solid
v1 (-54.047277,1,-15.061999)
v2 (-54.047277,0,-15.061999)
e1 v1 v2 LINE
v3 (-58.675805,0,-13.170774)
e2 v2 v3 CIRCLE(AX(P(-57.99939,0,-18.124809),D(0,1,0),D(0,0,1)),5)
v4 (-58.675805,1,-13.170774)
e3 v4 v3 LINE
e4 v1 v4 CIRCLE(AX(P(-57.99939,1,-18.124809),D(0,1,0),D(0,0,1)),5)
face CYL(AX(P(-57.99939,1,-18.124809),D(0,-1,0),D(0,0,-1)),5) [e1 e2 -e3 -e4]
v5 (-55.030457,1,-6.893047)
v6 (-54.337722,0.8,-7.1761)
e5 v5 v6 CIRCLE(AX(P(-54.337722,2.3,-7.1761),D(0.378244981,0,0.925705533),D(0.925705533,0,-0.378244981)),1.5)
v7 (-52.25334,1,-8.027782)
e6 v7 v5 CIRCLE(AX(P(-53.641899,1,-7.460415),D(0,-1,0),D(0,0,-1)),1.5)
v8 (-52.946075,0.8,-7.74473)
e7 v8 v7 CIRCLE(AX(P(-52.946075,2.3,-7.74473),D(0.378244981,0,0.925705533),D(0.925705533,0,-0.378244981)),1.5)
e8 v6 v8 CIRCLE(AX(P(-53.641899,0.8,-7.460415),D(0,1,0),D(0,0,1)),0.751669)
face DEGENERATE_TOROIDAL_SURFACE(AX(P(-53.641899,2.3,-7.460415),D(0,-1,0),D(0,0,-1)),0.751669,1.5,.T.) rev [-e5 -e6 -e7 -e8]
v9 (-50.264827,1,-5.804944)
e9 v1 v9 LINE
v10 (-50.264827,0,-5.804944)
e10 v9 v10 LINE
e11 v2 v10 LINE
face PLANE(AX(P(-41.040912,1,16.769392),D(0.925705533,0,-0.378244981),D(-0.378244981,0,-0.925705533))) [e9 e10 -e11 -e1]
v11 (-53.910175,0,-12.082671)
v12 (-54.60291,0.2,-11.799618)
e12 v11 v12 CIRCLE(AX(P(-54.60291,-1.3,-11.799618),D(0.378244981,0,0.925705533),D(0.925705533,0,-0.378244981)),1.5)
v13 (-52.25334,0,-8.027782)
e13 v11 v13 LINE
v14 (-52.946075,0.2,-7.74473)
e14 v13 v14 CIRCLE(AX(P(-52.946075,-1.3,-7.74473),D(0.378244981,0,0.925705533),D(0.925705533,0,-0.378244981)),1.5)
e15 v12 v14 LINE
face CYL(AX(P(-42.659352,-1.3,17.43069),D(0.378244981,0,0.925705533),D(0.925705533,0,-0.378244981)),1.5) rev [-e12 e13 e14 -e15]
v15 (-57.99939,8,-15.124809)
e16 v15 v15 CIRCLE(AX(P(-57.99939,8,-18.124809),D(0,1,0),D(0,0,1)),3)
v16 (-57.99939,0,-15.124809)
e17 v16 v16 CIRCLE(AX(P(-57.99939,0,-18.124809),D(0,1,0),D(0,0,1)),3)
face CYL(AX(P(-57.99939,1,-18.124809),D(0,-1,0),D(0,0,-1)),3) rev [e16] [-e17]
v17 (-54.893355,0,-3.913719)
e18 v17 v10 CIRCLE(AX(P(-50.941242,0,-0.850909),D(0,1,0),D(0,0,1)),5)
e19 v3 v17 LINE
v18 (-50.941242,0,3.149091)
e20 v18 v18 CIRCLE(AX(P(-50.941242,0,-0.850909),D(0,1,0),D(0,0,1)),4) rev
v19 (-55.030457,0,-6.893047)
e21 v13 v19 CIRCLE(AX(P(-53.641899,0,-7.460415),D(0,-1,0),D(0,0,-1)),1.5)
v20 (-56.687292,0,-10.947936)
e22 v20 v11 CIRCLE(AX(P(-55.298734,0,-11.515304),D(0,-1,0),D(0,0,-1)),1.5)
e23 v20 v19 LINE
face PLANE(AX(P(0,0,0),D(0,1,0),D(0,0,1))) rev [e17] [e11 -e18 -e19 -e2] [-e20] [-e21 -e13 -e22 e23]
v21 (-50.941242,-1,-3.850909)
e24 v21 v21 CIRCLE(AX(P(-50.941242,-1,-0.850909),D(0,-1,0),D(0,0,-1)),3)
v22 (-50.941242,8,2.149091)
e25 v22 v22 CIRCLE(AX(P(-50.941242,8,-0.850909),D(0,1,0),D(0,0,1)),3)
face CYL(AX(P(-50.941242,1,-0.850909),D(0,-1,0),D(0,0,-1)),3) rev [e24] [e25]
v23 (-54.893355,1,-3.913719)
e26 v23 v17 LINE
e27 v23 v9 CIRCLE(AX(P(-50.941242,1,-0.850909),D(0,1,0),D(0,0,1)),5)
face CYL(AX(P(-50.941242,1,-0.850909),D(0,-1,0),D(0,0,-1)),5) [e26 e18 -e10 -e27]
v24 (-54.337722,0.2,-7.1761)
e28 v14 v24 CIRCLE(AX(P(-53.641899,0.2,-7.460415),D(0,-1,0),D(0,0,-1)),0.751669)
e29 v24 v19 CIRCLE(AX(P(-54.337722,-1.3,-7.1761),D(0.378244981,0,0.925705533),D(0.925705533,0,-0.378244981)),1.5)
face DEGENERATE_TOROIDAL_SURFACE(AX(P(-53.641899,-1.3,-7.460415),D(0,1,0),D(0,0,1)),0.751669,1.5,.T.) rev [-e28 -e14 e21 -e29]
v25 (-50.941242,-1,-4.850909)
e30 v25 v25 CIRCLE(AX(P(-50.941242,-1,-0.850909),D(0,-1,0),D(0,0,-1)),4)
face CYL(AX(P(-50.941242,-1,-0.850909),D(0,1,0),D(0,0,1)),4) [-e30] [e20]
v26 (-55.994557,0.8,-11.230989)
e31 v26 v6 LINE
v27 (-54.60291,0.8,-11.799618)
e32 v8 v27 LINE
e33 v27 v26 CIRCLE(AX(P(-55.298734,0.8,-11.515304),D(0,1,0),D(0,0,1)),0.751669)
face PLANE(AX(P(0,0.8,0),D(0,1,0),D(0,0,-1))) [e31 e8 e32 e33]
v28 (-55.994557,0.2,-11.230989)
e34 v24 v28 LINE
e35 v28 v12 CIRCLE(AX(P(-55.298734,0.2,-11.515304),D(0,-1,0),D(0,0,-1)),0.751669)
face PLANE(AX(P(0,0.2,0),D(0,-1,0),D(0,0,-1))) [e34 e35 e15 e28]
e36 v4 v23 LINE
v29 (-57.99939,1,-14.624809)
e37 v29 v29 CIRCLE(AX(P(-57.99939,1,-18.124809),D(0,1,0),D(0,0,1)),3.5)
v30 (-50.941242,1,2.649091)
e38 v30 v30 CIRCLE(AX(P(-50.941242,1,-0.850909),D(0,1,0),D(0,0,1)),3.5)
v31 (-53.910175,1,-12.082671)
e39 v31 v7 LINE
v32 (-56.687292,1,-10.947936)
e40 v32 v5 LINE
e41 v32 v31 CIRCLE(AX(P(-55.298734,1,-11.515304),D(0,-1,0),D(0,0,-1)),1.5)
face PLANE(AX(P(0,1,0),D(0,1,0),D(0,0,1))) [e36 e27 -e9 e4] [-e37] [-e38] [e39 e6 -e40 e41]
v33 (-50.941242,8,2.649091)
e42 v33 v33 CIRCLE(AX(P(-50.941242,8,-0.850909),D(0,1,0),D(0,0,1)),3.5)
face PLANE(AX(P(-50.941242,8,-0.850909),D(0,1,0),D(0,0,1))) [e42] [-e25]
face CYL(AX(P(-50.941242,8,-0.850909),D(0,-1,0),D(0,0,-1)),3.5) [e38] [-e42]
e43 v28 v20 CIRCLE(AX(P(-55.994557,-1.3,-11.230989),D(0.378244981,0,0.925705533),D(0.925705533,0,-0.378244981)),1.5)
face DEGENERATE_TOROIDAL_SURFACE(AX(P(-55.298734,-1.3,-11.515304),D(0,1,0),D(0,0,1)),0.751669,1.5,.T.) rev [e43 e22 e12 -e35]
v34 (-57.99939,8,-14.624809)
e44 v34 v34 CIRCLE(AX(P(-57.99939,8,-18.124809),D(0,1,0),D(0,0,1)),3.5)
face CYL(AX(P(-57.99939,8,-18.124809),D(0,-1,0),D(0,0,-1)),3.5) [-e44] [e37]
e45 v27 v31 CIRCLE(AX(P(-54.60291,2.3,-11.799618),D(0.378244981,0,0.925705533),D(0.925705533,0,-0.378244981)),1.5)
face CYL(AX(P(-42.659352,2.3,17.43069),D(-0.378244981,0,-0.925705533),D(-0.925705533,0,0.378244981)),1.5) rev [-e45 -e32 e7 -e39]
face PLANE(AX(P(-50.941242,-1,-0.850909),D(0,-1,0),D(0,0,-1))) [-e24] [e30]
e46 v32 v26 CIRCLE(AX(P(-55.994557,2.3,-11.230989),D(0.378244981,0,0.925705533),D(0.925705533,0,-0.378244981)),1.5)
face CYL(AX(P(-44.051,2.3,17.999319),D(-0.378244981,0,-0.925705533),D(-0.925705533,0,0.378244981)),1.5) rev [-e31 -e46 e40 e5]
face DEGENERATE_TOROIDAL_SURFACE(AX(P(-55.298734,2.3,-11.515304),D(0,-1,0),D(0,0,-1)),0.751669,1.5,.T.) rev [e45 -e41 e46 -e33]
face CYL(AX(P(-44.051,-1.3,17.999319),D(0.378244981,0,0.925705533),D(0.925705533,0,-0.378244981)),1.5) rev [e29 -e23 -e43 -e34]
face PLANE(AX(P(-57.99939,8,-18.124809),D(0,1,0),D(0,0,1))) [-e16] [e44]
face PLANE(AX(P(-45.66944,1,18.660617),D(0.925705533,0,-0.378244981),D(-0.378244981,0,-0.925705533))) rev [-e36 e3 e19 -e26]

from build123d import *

# Parameters (mm, degrees)
CROQUIS1_R               = 3
SALIENTE_EXTRUIR1_DEPTH  = 1
CROQUIS2_R               = 3.5
CROQUIS2_R_2             = 3
SALIENTE_EXTRUIR2_DEPTH  = 7
SALIENTE_EXTRUIR3_START  = 1
CROQUIS3_R               = 4
CROQUIS3_R_2             = 3
SALIENTE_EXTRUIR3_DEPTH  = 1
CORTAR_EXTRUIR3_DEPTH    = 0.2
REDONDEO4_R              = 1.5
REDONDEO4_OF_SIMETR_A4_R = 1.5


with BuildPart() as part:
    # Croquis1 → Saliente-Extruir1 (new body)
    with BuildSketch(Plane(origin=(0, 0, 0), x_dir=(1, 0, 0), z_dir=(0, 1, 0))):
        with BuildLine():
            Line((-50.264827345, 5.804943896), (-54.04727716, 15.061999227))
            ThreePointArc((-54.04727716, 15.061999227), (-59.890614713, 22.75333698), (-58.675804825, 13.17077432))
            Line((-58.675804825, 13.17077432), (-54.893355011, 3.913718989))
            ThreePointArc((-54.893355011, 3.913718989), (-49.050017457, -3.777618763), (-50.264827345, 5.804943896))
        make_face()
        with Locations(Location((-57.999389806, 18.124809314, 0), (0, 0, 270))):
            Circle(CROQUIS1_R, mode=Mode.SUBTRACT)
        with Locations(Location((-50.941242364, 0.850908902, 0), (0, 0, 270))):
            Circle(CROQUIS1_R, mode=Mode.SUBTRACT)
    extrude(amount=SALIENTE_EXTRUIR1_DEPTH)

    # Croquis2 → Saliente-Extruir2 (add)
    # profile 1 of 2: a face of its own
    with BuildSketch(Plane(origin=(0, 1, 0), x_dir=(1, 0, 0), z_dir=(0, 1, 0))):
        with Locations(Location((-50.941242364, 0.850908902, 0), (0, 0, 270))):
            Circle(CROQUIS2_R)
        with Locations(Location((-50.941242364, 0.850908902, 0), (0, 0, 270))):
            Circle(CROQUIS2_R_2, mode=Mode.SUBTRACT)
    # profile 2 of 2: a face of its own
    with BuildSketch(Plane(origin=(0, 1, 0), x_dir=(1, 0, 0), z_dir=(0, 1, 0))):
        with Locations(Location((-57.999389806, 18.124809314, 0), (0, 0, 270))):
            Circle(CROQUIS2_R)
        with Locations(Location((-57.999389806, 18.124809314, 0), (0, 0, 270))):
            Circle(CROQUIS2_R_2, mode=Mode.SUBTRACT)
    extrude(amount=SALIENTE_EXTRUIR2_DEPTH)

    # Croquis3 → Saliente-Extruir3 (add)
    with BuildSketch(Plane.XZ.offset(SALIENTE_EXTRUIR3_START)):
        with Locations(Location((-50.941242364, -0.850908902, 0), (0, 0, 90))):
            Circle(CROQUIS3_R)
        with Locations(Location((-50.941242364, -0.850908902, 0), (0, 0, 270))):
            Circle(CROQUIS3_R_2, mode=Mode.SUBTRACT)
    extrude(amount=-SALIENTE_EXTRUIR3_DEPTH)

    # Croquis4 → Cortar-Extruir3 (cut)
    with BuildSketch(Plane.XZ):
        with BuildLine():
            Line((-55.03045688, -6.89304724), (-53.64189858, -7.460414712))
            Line((-53.64189858, -7.460414712), (-53.074531108, -6.071856412))
            ThreePointArc((-53.074531108, -6.071856412), (-54.222568183, -6.077366335), (-55.03045688, -6.89304724))
        make_face()
        with BuildLine():
            Line((-53.074531108, -6.071856412), (-53.64189858, -7.460414712))
            Line((-53.64189858, -7.460414712), (-52.253340281, -8.027782184))
            ThreePointArc((-52.253340281, -8.027782184), (-52.258850203, -6.879745109), (-53.074531108, -6.071856412))
        make_face()
        Polygon((-52.253340281, -8.027782184), (-53.64189858, -7.460414712), (-55.29873359, -11.515303505), (-53.91017529, -12.082670977), align=None)
        Polygon((-55.29873359, -11.515303505), (-53.64189858, -7.460414712), (-55.03045688, -6.89304724), (-56.68729189, -10.947936033), align=None)
        with BuildLine():
            Line((-53.91017529, -12.082670977), (-55.29873359, -11.515303505))
            Line((-55.29873359, -11.515303505), (-55.866101062, -12.903861804))
            ThreePointArc((-55.866101062, -12.903861804), (-54.718063987, -12.898351882), (-53.91017529, -12.082670977))
        make_face()
        with BuildLine():
            Line((-55.866101062, -12.903861804), (-55.29873359, -11.515303505))
            Line((-55.29873359, -11.515303505), (-56.68729189, -10.947936033))
            ThreePointArc((-56.68729189, -10.947936033), (-56.681781967, -12.095973108), (-55.866101062, -12.903861804))
        make_face()
    cortar_extruir3 = extrude(amount=-CORTAR_EXTRUIR3_DEPTH, mode=Mode.SUBTRACT)

    # Redondeo4
    # the kernel refuses this fillet: 1.5 mm, written as the material it adds along each edge
    with BuildSketch(Plane(origin=(-55.29873359, 0.2, -11.515303505), x_dir=(0.9257055331084191, 0, -0.3782449814240206), z_dir=(0.3782449814240206, 0, 0.9257055331084191))) as redondeo4_piece_1:
        with BuildLine():
            CenterArc((0.751668523, -1.5), REDONDEO4_R, 60.073565133, 29.926434867)
            Line((0.751668523, 0), (0.751668523, 0.03))
            Line((0.751668523, 0.03), (1.5, 0.03))
            Line((1.5, 0.03), (1.53, 0))
            ThreePointArc((1.53, 0), (1.53, -0.1), (1.51496663, -0.174))
            Line((1.51496663, -0.174), (1.5, -0.2))
        make_face()
    revolve(axis=Axis((-55.29873359, 0.2, -11.515303505), (0, 1, 0)), revolution_arc=180)
    with BuildSketch(Plane(origin=(-53.91017529, 0.2, -12.082670977), x_dir=(0, -1, 0), z_dir=(0.37824498142401725, 0, 0.9257055331084204)), Plane(origin=(-55.03045688, 0.2, -6.89304724), x_dir=(0, -1, 0), z_dir=(-0.3782449814240187, 0, -0.9257055331084199))) as redondeo4_piece_2:
        with BuildLine():
            CenterArc((1.5, -0.748331477), REDONDEO4_R, 150.073565133, 29.926434867)
            Line((0, -0.748331477), (-0.03, -0.748331477))
            Line((-0.03, -0.748331477), (-0.03, 0))
            Line((-0.03, 0), (0, 0.03))
            ThreePointArc((0, 0.03), (0.1, 0.03), (0.174, 0.01496663))
            Line((0.174, 0.01496663), (0.2, 0))
        make_face()
    extrude(amount=4.380322519)
    with BuildSketch(Plane(origin=(-53.64189858, 0.2, -7.460414712), x_dir=(0.9257055331084226, 0, -0.378244981424012), z_dir=(-0.378244981424012, 0, -0.9257055331084226))) as redondeo4_piece_3:
        with BuildLine():
            CenterArc((0.751668523, 1.5), REDONDEO4_R, 270, 29.926434867)
            Line((0.751668523, 0), (0.751668523, -0.03))
            Line((0.751668523, -0.03), (1.5, -0.03))
            Line((1.5, -0.03), (1.53, 0))
            ThreePointArc((1.53, 0), (1.53, 0.1), (1.51496663, 0.174))
            Line((1.51496663, 0.174), (1.5, 0.2))
        make_face()
    revolve(axis=Axis((-53.64189858, 0.2, -7.460414712), (0, -1, 0)), revolution_arc=180)

    # Simetría4: Cortar-Extruir3 across plane
    add(cortar_extruir3.mirror(Plane(origin=(0, 0.5, 0), x_dir=(0, 0, 1), z_dir=(0, -1, 0))), mode=Mode.SUBTRACT)

    # Redondeo4 of Simetría4
    # the kernel refuses this fillet: 1.5 mm, written as the material it adds along each edge
    with BuildSketch(Plane(origin=(-55.29873359, 0.8, -11.515303505), x_dir=(0.9257055331084191, 0, -0.3782449814240206), z_dir=(0.3782449814240206, 0, 0.9257055331084191))) as redondeo4_of_simetr_a4_piece_1:
        with BuildLine():
            CenterArc((0.751668523, 1.5), REDONDEO4_OF_SIMETR_A4_R, 270, 29.926434867)
            Line((0.751668523, 0), (0.751668523, -0.03))
            Line((0.751668523, -0.03), (1.5, -0.03))
            Line((1.5, -0.03), (1.53, 0))
            ThreePointArc((1.53, 0), (1.53, 0.1), (1.51496663, 0.174))
            Line((1.51496663, 0.174), (1.5, 0.2))
        make_face()
    revolve(axis=Axis((-55.29873359, 0.8, -11.515303505), (0, 1, 0)), revolution_arc=180)
    with BuildSketch(Plane(origin=(-53.91017529, 0.8, -12.082670977), x_dir=(0, 1, 0), z_dir=(0.37824498142401725, 0, 0.9257055331084204)), Plane(origin=(-55.03045688, 0.8, -6.89304724), x_dir=(0, 1, 0), z_dir=(-0.3782449814240187, 0, -0.9257055331084199))) as redondeo4_of_simetr_a4_piece_2:
        with BuildLine():
            CenterArc((1.5, 0.748331477), REDONDEO4_OF_SIMETR_A4_R, 180, 29.926434867)
            Line((0, 0.748331477), (-0.03, 0.748331477))
            Line((-0.03, 0.748331477), (-0.03, 0))
            Line((-0.03, 0), (0, -0.03))
            ThreePointArc((0, -0.03), (0.1, -0.03), (0.174, -0.01496663))
            Line((0.174, -0.01496663), (0.2, 0))
        make_face()
    extrude(amount=4.380322519)
    with BuildSketch(Plane(origin=(-53.64189858, 0.8, -7.460414712), x_dir=(0.9257055331084226, 0, -0.378244981424012), z_dir=(-0.378244981424012, 0, -0.9257055331084226))) as redondeo4_of_simetr_a4_piece_3:
        with BuildLine():
            CenterArc((0.751668523, -1.5), REDONDEO4_OF_SIMETR_A4_R, 60.073565133, 29.926434867)
            Line((0.751668523, 0), (0.751668523, 0.03))
            Line((0.751668523, 0.03), (1.5, 0.03))
            Line((1.5, 0.03), (1.53, 0))
            ThreePointArc((1.53, 0), (1.53, -0.1), (1.51496663, -0.174))
            Line((1.51496663, -0.174), (1.5, -0.2))
        make_face()
    revolve(axis=Axis((-53.64189858, 0.8, -7.460414712), (0, -1, 0)), revolution_arc=180)


solid = part.part
